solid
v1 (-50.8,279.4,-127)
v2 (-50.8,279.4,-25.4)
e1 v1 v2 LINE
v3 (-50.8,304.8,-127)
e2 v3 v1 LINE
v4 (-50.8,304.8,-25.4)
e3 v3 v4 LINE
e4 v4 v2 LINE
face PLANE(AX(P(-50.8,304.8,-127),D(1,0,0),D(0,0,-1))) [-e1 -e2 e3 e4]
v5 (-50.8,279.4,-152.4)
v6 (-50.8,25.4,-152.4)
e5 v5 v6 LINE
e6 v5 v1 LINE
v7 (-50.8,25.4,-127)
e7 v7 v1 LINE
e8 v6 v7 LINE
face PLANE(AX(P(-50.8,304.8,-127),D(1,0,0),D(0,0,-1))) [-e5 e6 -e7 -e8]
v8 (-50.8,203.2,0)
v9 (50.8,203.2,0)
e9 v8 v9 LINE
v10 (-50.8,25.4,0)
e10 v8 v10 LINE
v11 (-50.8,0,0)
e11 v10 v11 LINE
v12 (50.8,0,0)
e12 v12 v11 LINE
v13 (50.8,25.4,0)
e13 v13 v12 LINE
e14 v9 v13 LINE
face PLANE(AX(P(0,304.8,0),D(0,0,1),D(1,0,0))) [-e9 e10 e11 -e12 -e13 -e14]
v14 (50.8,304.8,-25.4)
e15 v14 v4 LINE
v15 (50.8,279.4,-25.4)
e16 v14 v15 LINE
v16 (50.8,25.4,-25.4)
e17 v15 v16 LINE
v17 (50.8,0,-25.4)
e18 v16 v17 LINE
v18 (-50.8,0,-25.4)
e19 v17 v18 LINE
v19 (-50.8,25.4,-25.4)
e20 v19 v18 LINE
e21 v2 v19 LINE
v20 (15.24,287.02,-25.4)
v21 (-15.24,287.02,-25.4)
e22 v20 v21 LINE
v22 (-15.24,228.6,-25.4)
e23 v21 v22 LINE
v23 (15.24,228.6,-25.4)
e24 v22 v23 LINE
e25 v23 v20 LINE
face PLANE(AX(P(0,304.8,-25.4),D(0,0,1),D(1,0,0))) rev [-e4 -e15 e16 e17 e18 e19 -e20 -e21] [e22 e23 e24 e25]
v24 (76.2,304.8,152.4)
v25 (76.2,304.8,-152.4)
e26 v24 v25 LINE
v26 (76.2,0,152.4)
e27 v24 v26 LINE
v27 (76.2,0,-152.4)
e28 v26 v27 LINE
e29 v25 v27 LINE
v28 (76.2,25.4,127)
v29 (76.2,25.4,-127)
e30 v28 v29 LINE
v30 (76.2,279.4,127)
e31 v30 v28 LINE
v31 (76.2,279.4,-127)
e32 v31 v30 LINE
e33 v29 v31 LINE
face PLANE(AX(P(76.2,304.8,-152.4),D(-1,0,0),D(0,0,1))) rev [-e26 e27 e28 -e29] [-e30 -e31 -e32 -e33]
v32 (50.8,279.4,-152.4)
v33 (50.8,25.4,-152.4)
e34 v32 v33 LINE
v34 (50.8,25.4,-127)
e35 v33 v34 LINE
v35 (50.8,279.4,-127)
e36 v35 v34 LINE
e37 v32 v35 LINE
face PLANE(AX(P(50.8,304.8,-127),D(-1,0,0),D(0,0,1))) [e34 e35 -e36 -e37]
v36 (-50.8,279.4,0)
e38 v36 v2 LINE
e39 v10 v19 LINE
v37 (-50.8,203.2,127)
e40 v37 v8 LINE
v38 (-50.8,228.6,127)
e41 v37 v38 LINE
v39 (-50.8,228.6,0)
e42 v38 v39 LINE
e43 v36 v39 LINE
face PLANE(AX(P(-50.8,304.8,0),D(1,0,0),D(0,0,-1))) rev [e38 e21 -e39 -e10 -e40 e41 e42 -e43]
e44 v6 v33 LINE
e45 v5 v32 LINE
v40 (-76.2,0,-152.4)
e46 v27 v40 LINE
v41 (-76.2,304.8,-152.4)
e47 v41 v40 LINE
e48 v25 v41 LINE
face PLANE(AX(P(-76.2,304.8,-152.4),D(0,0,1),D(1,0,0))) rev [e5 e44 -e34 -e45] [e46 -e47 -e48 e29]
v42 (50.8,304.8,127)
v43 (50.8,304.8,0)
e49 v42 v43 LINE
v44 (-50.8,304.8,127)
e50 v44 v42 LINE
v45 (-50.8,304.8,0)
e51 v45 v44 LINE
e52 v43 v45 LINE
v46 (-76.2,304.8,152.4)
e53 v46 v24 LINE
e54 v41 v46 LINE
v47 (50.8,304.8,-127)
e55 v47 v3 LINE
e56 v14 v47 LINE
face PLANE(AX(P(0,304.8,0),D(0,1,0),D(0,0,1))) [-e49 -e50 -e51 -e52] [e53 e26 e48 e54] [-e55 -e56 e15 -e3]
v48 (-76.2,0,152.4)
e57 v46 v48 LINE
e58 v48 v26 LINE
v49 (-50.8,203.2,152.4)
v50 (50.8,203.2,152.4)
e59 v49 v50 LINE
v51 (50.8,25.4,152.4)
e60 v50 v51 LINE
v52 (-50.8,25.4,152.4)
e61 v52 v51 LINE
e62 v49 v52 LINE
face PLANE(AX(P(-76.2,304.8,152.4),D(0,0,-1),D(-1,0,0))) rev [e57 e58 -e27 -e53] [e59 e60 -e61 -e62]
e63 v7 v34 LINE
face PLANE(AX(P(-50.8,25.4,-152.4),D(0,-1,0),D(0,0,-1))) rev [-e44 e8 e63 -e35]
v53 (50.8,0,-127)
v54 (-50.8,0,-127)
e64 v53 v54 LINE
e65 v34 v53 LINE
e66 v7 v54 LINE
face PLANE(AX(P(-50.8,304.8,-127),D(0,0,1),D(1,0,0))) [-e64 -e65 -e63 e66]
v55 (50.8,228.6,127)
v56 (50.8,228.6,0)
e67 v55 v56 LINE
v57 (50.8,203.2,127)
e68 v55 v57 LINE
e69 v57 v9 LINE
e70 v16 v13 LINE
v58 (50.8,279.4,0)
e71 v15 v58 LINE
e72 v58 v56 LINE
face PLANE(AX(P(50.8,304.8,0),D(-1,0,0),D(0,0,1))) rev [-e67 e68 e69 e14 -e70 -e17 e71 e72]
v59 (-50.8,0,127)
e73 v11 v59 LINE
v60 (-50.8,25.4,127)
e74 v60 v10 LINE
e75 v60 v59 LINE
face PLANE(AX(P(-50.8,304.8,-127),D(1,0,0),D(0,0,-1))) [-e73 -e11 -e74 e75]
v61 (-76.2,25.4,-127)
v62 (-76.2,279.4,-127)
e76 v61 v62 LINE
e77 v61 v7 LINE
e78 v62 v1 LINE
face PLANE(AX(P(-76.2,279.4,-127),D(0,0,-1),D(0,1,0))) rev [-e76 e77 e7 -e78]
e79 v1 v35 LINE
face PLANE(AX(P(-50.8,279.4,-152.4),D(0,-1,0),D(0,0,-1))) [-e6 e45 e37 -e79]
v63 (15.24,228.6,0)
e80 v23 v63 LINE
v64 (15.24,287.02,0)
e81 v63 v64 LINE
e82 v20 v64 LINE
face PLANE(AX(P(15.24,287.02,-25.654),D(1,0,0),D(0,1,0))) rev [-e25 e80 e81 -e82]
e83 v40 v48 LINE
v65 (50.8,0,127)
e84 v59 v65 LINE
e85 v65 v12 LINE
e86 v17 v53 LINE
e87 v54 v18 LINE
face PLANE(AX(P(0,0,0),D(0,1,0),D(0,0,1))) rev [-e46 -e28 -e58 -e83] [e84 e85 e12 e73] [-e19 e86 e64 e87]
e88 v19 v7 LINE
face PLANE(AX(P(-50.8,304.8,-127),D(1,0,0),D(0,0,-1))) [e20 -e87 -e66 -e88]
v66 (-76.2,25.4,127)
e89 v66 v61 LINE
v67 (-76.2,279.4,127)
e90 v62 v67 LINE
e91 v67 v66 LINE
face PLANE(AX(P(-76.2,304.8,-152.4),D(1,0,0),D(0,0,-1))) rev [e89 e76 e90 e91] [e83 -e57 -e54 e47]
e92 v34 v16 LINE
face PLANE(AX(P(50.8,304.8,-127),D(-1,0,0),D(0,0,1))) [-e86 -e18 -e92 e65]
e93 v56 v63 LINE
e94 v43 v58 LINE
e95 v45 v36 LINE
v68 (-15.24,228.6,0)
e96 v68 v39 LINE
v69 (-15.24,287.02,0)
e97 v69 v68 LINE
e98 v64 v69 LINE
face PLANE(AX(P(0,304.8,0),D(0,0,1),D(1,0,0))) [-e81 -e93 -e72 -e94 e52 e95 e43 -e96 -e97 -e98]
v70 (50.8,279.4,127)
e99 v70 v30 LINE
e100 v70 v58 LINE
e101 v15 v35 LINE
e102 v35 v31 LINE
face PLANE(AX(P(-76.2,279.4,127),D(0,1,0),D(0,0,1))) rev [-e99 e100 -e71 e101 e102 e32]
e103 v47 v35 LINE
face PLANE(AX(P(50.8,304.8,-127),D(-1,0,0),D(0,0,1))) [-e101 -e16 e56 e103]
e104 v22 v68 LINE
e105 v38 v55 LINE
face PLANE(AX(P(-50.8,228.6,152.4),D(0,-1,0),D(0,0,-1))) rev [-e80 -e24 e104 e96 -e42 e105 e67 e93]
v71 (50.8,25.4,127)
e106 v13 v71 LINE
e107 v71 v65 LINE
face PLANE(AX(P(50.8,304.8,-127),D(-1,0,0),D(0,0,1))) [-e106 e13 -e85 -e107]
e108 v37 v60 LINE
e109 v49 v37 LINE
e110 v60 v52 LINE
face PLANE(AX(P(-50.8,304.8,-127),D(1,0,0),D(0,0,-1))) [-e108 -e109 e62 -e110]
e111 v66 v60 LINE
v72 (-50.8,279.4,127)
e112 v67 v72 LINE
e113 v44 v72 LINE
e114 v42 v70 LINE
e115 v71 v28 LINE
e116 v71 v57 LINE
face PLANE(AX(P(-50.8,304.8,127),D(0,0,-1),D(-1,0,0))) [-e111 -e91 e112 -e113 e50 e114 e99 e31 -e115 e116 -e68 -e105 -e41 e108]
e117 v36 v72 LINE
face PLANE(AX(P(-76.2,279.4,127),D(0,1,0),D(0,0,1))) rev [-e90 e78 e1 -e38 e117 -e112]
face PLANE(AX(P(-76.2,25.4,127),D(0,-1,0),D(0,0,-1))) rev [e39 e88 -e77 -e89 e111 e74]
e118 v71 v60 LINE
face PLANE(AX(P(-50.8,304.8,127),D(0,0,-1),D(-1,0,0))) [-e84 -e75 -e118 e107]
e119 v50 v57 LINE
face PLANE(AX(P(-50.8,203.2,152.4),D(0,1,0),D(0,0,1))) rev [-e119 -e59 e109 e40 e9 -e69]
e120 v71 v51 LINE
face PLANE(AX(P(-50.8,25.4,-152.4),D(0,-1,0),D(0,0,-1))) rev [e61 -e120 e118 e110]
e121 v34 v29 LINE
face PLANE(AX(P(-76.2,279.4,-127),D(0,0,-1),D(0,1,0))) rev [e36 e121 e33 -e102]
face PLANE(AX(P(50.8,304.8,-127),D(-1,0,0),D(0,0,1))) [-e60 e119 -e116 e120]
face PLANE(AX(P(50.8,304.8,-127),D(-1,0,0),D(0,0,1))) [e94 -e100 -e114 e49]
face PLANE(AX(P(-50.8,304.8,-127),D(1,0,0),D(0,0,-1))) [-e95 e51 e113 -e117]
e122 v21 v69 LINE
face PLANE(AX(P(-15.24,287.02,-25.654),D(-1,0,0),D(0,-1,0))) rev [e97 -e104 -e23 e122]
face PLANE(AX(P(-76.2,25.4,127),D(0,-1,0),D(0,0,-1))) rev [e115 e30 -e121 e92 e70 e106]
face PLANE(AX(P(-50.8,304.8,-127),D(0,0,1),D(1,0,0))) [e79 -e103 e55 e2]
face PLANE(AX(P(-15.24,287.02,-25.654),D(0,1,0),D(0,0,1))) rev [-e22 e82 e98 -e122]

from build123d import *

# Parameters (mm, degrees)
SKETCH1_W               = 152.4
SKETCH1_H               = 304.8
SKETCH1_W_2             = 101.6
SKETCH1_H_2             = 254
BOSS_EXTRUDE1_DEPTH     = 304.8
SKETCH2_W               = 101.6
SKETCH2_H               = 254
CUT_EXTRUDE1_DEPTH      = 304.8
SKETCH5_W               = 254
SKETCH5_H               = 254
CUT_EXTRUDE2_DEPTH      = 374.3022368
BOSS_EXTRUDE2_START     = -304.8
BOSS_EXTRUDE2_OUTLINE_W = 101.6
BOSS_EXTRUDE2_OUTLINE_H = 25.4
BOSS_EXTRUDE2_DEPTH     = 304.8
SKETCH6_W               = 101.6
SKETCH6_H               = 25.4
BOSS_EXTRUDE3_DEPTH     = 152.4
SKETCH7_W               = 30.48
SKETCH7_H               = 58.42
CUT_EXTRUDE3_DEPTH      = 25.654
SKETCH8_W               = 101.6
SKETCH8_H               = 50.8
BOSS_EXTRUDE4_DEPTH     = 25.4


# Read off the part's stored shape, not the designer's step: Boss-Extrude2
with BuildPart() as part:
    # Sketch1 → Boss-Extrude1 (new body)
    with BuildSketch(Plane(origin=(0, 0, 0), x_dir=(1, 0, 0), z_dir=(0, 1, 0))):
        Rectangle(SKETCH1_W, SKETCH1_H)
        Rectangle(SKETCH1_W_2, SKETCH1_H_2, mode=Mode.SUBTRACT)
    extrude(amount=BOSS_EXTRUDE1_DEPTH)

    # Sketch2 → Cut-Extrude1 (cut)
    with BuildSketch(Plane.XY.offset(152.4)):
        with Locations((0, 152.4)):
            Rectangle(SKETCH2_W, SKETCH2_H)
    extrude(amount=-CUT_EXTRUDE1_DEPTH, mode=Mode.SUBTRACT)

    # Sketch5 → Cut-Extrude2 (cut, through all)
    with BuildSketch(Plane(origin=(76.2, 0, 0), x_dir=(0, 0, -1), z_dir=(1, 0, 0))):
        with Locations((0, 152.4)):
            Rectangle(SKETCH5_W, SKETCH5_H)
    extrude(amount=-CUT_EXTRUDE2_DEPTH, mode=Mode.SUBTRACT)

    # Boss-Extrude2 outline → Boss-Extrude2 (add)
    with BuildSketch(Plane.XZ.offset(BOSS_EXTRUDE2_START)):
        with Locations((0, -12.7)):
            Rectangle(BOSS_EXTRUDE2_OUTLINE_W, BOSS_EXTRUDE2_OUTLINE_H)
    extrude(amount=BOSS_EXTRUDE2_DEPTH)

    # Sketch6 → Boss-Extrude3 (add)
    with BuildSketch(Plane.XY):
        with Locations((0, 215.9)):
            Rectangle(SKETCH6_W, SKETCH6_H)
    extrude(amount=BOSS_EXTRUDE3_DEPTH)

    # Sketch7 → Cut-Extrude3 (cut)
    with BuildSketch(Plane.XY):
        with Locations((0, 257.81)):
            Rectangle(SKETCH7_W, SKETCH7_H)
    extrude(amount=-CUT_EXTRUDE3_DEPTH, mode=Mode.SUBTRACT)

    # Sketch8 → Boss-Extrude4 (add)
    with BuildSketch(Plane.XY.offset(152.4)):
        with Locations((0, 254)):
            Rectangle(SKETCH8_W, SKETCH8_H)
    extrude(amount=-BOSS_EXTRUDE4_DEPTH)


solid = part.part
